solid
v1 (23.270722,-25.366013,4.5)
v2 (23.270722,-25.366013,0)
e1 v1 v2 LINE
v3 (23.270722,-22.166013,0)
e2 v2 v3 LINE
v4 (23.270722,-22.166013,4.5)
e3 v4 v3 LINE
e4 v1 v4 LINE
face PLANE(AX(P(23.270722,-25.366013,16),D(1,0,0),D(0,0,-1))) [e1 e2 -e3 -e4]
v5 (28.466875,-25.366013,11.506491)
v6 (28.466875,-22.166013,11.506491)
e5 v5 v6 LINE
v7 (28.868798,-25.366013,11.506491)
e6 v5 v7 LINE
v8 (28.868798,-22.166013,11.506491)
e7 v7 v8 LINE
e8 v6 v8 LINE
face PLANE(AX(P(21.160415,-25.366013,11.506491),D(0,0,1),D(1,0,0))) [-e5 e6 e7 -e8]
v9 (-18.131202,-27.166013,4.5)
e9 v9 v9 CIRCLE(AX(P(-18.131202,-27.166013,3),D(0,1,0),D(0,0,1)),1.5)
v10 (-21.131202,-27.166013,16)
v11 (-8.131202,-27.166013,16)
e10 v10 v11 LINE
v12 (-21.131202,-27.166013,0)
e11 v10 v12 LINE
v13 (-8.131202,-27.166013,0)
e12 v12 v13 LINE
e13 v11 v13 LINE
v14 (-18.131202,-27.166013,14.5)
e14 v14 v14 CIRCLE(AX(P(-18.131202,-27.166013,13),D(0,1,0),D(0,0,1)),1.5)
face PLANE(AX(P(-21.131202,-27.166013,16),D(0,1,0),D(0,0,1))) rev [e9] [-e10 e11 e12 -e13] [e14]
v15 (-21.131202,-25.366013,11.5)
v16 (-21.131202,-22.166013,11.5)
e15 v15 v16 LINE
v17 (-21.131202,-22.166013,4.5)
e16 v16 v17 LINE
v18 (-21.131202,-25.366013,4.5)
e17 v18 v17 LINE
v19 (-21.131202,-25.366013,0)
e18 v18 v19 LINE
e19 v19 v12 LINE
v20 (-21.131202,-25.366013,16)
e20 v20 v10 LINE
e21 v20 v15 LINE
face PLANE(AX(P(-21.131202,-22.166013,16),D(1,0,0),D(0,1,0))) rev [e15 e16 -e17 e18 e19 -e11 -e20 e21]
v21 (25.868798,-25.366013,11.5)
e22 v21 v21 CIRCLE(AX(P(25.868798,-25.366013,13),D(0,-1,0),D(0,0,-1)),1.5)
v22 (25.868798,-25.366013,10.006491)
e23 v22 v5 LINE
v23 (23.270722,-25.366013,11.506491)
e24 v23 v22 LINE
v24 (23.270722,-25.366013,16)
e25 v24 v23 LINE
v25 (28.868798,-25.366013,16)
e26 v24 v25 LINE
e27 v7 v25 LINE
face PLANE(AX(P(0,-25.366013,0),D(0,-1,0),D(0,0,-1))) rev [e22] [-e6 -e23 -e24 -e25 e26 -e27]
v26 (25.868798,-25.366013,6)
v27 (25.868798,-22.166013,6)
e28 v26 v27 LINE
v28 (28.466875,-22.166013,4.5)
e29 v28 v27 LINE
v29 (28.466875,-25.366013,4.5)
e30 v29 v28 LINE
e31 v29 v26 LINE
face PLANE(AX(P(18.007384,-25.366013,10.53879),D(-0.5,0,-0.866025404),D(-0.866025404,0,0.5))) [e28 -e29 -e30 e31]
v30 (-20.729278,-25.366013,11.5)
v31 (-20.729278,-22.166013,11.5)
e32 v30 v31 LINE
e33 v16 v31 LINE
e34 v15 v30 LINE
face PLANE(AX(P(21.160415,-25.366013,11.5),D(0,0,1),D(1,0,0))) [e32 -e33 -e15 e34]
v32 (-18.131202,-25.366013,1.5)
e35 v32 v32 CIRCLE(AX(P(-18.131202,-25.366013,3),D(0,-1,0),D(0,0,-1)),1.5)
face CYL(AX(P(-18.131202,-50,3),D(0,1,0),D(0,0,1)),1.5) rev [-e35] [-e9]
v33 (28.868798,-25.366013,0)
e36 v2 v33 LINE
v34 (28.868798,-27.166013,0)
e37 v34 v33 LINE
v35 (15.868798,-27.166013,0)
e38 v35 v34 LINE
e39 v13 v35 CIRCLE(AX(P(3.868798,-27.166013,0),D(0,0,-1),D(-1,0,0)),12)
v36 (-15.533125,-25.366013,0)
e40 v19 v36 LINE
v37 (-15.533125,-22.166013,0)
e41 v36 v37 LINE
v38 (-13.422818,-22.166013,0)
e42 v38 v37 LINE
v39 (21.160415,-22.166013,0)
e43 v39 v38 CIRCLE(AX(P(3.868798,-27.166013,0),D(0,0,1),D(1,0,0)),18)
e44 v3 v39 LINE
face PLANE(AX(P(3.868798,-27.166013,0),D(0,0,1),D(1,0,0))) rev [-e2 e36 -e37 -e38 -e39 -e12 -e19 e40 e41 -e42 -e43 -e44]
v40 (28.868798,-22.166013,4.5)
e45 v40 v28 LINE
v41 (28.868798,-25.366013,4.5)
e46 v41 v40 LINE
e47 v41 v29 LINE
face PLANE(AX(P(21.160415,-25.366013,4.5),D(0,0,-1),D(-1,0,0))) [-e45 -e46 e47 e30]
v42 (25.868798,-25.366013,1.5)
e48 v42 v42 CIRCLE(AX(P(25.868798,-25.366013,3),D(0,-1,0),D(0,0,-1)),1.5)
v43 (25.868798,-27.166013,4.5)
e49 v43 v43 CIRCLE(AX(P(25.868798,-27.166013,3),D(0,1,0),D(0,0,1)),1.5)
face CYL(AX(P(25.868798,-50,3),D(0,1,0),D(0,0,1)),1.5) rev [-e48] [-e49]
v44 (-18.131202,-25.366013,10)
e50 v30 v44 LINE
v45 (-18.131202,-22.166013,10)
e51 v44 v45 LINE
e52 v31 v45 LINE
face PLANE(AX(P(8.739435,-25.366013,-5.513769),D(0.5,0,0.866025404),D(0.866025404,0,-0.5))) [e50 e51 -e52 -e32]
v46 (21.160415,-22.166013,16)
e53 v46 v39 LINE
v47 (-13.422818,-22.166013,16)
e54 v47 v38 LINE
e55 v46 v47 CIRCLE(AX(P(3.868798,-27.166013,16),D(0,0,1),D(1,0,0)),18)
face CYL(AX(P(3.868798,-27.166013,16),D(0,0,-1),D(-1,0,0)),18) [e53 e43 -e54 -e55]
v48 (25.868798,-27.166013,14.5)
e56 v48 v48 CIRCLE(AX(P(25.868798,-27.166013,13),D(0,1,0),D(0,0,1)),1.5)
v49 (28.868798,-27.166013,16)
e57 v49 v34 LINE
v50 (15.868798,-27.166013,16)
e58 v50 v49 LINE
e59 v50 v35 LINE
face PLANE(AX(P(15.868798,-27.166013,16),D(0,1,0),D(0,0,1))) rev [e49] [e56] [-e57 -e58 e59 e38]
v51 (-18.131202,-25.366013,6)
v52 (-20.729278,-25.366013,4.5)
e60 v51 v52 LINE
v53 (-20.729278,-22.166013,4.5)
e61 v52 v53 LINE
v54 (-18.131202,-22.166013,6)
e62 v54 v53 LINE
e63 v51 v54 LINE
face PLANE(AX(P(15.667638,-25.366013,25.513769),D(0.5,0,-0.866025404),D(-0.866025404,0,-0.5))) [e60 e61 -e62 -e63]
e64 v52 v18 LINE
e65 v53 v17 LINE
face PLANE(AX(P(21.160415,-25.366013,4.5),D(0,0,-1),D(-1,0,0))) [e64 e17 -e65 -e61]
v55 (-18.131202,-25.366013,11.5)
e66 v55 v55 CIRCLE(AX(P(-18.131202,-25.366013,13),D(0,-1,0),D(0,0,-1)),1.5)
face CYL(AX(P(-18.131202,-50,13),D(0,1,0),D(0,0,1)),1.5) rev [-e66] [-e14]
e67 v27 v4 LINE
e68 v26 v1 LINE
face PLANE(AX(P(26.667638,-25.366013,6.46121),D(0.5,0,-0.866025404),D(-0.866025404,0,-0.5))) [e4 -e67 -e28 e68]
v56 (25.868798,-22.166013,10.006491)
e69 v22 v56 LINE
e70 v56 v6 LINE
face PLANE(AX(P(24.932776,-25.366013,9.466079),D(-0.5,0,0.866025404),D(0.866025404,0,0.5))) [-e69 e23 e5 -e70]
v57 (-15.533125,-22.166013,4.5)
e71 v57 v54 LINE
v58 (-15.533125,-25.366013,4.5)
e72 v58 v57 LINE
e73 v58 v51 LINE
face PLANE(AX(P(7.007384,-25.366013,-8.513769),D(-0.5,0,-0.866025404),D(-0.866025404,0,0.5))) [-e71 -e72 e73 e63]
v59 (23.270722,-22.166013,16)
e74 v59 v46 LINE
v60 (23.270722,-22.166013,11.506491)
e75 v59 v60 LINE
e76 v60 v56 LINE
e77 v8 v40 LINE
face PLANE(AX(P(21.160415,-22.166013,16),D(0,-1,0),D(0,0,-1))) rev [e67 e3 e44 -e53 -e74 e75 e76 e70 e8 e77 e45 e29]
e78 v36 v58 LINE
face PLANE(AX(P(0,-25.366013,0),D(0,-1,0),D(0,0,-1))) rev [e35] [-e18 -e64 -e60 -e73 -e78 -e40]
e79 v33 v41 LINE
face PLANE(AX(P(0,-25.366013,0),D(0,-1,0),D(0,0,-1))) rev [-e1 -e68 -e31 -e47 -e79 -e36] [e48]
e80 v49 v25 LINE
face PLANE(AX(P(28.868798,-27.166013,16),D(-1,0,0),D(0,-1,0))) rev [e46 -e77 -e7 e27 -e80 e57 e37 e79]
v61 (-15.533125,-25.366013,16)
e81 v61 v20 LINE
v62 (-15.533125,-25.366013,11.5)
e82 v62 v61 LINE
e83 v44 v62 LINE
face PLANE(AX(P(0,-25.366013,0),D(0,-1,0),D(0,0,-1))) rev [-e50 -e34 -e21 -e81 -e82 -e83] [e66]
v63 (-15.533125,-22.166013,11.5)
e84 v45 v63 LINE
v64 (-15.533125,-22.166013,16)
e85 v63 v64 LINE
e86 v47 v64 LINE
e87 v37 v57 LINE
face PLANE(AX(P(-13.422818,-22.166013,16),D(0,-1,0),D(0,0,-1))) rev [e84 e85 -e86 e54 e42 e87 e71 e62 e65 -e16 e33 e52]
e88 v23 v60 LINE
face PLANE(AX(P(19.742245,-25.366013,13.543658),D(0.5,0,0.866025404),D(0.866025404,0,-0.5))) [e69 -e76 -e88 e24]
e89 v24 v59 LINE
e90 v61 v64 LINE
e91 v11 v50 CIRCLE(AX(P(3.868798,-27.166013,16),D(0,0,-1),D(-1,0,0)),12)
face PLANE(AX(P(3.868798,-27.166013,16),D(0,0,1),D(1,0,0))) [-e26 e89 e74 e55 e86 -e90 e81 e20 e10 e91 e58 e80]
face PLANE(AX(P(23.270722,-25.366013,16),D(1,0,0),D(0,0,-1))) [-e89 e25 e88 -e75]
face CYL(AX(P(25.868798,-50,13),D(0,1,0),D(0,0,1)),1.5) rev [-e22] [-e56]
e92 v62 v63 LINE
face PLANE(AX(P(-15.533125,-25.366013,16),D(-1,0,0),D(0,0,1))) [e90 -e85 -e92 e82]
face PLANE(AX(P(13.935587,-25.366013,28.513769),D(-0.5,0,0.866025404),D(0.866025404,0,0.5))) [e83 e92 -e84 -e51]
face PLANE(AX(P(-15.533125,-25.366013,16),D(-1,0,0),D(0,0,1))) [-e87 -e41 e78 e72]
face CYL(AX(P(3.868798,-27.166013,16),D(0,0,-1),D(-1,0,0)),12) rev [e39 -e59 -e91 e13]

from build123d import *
from OCP.BRepAlgoAPI import BRepAlgoAPI_Cut
from OCP.TopTools import TopTools_ListOfShape

# Parameters (mm, degrees)
BOSS_EXTRUDE1_DEPTH = 16
CUT_EXTRUDE12_START = -22.166013
CUT_EXTRUDE12_DEPTH = 3.2
SKETCH14_R          = 1.5
CUT_EXTRUDE13_DEPTH = 50


with BuildPart() as part:
    # Sketch7 → Boss-Extrude1 (new body)
    with BuildSketch(Plane.XY):
        with BuildLine():
            Line((28.868798372, -27.16601268), (28.868798372, -22.16601268))
            Line((28.868798372, -22.16601268), (21.160414837, -22.16601268))
            ThreePointArc((21.160414837, -22.16601268), (3.868798372, -9.16601268), (-13.422818094, -22.16601268))
            Line((-13.422818094, -22.16601268), (-21.131201628, -22.16601268))
            Line((-21.131201628, -22.16601268), (-21.131201628, -27.16601268))
            Line((-21.131201628, -27.16601268), (-8.131201628, -27.16601268))
            ThreePointArc((-8.131201628, -27.16601268), (3.868798372, -15.16601268), (15.868798372, -27.16601268))
            Line((15.868798372, -27.16601268), (28.868798372, -27.16601268))
        make_face()
    extrude(amount=BOSS_EXTRUDE1_DEPTH)


with BuildPart() as cut_extrude12_tool:
    # Sketch13 → Cut-Extrude12 (new body)
    with BuildSketch(Plane(origin=(0, 0, 0), x_dir=(1, 0, 0), z_dir=(0, 1, 0)).offset(CUT_EXTRUDE12_START)):
        Polygon((-15.533125417, -4.5), (-15.533125417, -1.5), (-15.533125417, 0), (-18.131201628, 0), (-20.72927784, 0), (-21.131201628, 0), (-21.131201628, -4.5), (-20.72927784, -4.5), (-18.131201628, -6), align=None)
        Polygon((-21.131201628, -11.5), (-20.72927784, -11.5), (-18.131201628, -10), (-15.533125417, -11.5), (-15.533125417, -11.544775658), (-15.533125417, -16), (-18.131201628, -16), (-20.72927784, -16), (-21.131201628, -16), align=None)
        Polygon((23.27072216, -4.5), (23.27072216, -1.5), (23.27072216, 0), (25.868798372, 0), (28.466874583, 0), (28.868798372, 0), (28.868798372, -4.5), (28.466874583, -4.5), (25.868798372, -6), align=None)
        Polygon((28.466874583, -11.506491479), (25.868798372, -10.006491479), (23.27072216, -11.506491479), (23.27072216, -14.506491479), (23.27072216, -16.006491479), (25.868798372, -16.006491479), (28.466874583, -16.006491479), (28.868798372, -16.006491479), (28.868798372, -11.506491479), align=None)
    extrude(amount=-CUT_EXTRUDE12_DEPTH)


with BuildPart() as part_1:
    add(part.part)

    # Cut-Extrude12: cut by cut_extrude12_tool, with a tolerance
    cut_extrude12_stock = TopTools_ListOfShape()
    cut_extrude12_stock.Append(part_1.part.wrapped)
    cut_extrude12_tools = TopTools_ListOfShape()
    cut_extrude12_tools.Append(cut_extrude12_tool.part.wrapped)
    cut_extrude12_cut = BRepAlgoAPI_Cut()
    cut_extrude12_cut.SetArguments(cut_extrude12_stock)
    cut_extrude12_cut.SetTools(cut_extrude12_tools)
    cut_extrude12_cut.SetFuzzyValue(0.00001)
    cut_extrude12_cut.Build()
    add(Compound.cast(cut_extrude12_cut.Shape()).solids(), mode=Mode.REPLACE)

    # Sketch14 → Cut-Extrude13 (cut)
    with BuildSketch(Plane(origin=(0, 0, 0), x_dir=(1, 0, 0), z_dir=(0, 1, 0))):
        with Locations(Location((-18.131201628, -3, 0), (0, 0, 270))):
            Circle(SKETCH14_R)
        with Locations(Location((-18.131201628, -13, 0), (0, 0, 270))):
            Circle(SKETCH14_R)
        with Locations(Location((25.868798372, -3, 0), (0, 0, 270))):
            Circle(SKETCH14_R)
        with Locations(Location((25.868798372, -13, 0), (0, 0, 270))):
            Circle(SKETCH14_R)
    extrude(amount=-CUT_EXTRUDE13_DEPTH, mode=Mode.SUBTRACT)


solid = part_1.part
